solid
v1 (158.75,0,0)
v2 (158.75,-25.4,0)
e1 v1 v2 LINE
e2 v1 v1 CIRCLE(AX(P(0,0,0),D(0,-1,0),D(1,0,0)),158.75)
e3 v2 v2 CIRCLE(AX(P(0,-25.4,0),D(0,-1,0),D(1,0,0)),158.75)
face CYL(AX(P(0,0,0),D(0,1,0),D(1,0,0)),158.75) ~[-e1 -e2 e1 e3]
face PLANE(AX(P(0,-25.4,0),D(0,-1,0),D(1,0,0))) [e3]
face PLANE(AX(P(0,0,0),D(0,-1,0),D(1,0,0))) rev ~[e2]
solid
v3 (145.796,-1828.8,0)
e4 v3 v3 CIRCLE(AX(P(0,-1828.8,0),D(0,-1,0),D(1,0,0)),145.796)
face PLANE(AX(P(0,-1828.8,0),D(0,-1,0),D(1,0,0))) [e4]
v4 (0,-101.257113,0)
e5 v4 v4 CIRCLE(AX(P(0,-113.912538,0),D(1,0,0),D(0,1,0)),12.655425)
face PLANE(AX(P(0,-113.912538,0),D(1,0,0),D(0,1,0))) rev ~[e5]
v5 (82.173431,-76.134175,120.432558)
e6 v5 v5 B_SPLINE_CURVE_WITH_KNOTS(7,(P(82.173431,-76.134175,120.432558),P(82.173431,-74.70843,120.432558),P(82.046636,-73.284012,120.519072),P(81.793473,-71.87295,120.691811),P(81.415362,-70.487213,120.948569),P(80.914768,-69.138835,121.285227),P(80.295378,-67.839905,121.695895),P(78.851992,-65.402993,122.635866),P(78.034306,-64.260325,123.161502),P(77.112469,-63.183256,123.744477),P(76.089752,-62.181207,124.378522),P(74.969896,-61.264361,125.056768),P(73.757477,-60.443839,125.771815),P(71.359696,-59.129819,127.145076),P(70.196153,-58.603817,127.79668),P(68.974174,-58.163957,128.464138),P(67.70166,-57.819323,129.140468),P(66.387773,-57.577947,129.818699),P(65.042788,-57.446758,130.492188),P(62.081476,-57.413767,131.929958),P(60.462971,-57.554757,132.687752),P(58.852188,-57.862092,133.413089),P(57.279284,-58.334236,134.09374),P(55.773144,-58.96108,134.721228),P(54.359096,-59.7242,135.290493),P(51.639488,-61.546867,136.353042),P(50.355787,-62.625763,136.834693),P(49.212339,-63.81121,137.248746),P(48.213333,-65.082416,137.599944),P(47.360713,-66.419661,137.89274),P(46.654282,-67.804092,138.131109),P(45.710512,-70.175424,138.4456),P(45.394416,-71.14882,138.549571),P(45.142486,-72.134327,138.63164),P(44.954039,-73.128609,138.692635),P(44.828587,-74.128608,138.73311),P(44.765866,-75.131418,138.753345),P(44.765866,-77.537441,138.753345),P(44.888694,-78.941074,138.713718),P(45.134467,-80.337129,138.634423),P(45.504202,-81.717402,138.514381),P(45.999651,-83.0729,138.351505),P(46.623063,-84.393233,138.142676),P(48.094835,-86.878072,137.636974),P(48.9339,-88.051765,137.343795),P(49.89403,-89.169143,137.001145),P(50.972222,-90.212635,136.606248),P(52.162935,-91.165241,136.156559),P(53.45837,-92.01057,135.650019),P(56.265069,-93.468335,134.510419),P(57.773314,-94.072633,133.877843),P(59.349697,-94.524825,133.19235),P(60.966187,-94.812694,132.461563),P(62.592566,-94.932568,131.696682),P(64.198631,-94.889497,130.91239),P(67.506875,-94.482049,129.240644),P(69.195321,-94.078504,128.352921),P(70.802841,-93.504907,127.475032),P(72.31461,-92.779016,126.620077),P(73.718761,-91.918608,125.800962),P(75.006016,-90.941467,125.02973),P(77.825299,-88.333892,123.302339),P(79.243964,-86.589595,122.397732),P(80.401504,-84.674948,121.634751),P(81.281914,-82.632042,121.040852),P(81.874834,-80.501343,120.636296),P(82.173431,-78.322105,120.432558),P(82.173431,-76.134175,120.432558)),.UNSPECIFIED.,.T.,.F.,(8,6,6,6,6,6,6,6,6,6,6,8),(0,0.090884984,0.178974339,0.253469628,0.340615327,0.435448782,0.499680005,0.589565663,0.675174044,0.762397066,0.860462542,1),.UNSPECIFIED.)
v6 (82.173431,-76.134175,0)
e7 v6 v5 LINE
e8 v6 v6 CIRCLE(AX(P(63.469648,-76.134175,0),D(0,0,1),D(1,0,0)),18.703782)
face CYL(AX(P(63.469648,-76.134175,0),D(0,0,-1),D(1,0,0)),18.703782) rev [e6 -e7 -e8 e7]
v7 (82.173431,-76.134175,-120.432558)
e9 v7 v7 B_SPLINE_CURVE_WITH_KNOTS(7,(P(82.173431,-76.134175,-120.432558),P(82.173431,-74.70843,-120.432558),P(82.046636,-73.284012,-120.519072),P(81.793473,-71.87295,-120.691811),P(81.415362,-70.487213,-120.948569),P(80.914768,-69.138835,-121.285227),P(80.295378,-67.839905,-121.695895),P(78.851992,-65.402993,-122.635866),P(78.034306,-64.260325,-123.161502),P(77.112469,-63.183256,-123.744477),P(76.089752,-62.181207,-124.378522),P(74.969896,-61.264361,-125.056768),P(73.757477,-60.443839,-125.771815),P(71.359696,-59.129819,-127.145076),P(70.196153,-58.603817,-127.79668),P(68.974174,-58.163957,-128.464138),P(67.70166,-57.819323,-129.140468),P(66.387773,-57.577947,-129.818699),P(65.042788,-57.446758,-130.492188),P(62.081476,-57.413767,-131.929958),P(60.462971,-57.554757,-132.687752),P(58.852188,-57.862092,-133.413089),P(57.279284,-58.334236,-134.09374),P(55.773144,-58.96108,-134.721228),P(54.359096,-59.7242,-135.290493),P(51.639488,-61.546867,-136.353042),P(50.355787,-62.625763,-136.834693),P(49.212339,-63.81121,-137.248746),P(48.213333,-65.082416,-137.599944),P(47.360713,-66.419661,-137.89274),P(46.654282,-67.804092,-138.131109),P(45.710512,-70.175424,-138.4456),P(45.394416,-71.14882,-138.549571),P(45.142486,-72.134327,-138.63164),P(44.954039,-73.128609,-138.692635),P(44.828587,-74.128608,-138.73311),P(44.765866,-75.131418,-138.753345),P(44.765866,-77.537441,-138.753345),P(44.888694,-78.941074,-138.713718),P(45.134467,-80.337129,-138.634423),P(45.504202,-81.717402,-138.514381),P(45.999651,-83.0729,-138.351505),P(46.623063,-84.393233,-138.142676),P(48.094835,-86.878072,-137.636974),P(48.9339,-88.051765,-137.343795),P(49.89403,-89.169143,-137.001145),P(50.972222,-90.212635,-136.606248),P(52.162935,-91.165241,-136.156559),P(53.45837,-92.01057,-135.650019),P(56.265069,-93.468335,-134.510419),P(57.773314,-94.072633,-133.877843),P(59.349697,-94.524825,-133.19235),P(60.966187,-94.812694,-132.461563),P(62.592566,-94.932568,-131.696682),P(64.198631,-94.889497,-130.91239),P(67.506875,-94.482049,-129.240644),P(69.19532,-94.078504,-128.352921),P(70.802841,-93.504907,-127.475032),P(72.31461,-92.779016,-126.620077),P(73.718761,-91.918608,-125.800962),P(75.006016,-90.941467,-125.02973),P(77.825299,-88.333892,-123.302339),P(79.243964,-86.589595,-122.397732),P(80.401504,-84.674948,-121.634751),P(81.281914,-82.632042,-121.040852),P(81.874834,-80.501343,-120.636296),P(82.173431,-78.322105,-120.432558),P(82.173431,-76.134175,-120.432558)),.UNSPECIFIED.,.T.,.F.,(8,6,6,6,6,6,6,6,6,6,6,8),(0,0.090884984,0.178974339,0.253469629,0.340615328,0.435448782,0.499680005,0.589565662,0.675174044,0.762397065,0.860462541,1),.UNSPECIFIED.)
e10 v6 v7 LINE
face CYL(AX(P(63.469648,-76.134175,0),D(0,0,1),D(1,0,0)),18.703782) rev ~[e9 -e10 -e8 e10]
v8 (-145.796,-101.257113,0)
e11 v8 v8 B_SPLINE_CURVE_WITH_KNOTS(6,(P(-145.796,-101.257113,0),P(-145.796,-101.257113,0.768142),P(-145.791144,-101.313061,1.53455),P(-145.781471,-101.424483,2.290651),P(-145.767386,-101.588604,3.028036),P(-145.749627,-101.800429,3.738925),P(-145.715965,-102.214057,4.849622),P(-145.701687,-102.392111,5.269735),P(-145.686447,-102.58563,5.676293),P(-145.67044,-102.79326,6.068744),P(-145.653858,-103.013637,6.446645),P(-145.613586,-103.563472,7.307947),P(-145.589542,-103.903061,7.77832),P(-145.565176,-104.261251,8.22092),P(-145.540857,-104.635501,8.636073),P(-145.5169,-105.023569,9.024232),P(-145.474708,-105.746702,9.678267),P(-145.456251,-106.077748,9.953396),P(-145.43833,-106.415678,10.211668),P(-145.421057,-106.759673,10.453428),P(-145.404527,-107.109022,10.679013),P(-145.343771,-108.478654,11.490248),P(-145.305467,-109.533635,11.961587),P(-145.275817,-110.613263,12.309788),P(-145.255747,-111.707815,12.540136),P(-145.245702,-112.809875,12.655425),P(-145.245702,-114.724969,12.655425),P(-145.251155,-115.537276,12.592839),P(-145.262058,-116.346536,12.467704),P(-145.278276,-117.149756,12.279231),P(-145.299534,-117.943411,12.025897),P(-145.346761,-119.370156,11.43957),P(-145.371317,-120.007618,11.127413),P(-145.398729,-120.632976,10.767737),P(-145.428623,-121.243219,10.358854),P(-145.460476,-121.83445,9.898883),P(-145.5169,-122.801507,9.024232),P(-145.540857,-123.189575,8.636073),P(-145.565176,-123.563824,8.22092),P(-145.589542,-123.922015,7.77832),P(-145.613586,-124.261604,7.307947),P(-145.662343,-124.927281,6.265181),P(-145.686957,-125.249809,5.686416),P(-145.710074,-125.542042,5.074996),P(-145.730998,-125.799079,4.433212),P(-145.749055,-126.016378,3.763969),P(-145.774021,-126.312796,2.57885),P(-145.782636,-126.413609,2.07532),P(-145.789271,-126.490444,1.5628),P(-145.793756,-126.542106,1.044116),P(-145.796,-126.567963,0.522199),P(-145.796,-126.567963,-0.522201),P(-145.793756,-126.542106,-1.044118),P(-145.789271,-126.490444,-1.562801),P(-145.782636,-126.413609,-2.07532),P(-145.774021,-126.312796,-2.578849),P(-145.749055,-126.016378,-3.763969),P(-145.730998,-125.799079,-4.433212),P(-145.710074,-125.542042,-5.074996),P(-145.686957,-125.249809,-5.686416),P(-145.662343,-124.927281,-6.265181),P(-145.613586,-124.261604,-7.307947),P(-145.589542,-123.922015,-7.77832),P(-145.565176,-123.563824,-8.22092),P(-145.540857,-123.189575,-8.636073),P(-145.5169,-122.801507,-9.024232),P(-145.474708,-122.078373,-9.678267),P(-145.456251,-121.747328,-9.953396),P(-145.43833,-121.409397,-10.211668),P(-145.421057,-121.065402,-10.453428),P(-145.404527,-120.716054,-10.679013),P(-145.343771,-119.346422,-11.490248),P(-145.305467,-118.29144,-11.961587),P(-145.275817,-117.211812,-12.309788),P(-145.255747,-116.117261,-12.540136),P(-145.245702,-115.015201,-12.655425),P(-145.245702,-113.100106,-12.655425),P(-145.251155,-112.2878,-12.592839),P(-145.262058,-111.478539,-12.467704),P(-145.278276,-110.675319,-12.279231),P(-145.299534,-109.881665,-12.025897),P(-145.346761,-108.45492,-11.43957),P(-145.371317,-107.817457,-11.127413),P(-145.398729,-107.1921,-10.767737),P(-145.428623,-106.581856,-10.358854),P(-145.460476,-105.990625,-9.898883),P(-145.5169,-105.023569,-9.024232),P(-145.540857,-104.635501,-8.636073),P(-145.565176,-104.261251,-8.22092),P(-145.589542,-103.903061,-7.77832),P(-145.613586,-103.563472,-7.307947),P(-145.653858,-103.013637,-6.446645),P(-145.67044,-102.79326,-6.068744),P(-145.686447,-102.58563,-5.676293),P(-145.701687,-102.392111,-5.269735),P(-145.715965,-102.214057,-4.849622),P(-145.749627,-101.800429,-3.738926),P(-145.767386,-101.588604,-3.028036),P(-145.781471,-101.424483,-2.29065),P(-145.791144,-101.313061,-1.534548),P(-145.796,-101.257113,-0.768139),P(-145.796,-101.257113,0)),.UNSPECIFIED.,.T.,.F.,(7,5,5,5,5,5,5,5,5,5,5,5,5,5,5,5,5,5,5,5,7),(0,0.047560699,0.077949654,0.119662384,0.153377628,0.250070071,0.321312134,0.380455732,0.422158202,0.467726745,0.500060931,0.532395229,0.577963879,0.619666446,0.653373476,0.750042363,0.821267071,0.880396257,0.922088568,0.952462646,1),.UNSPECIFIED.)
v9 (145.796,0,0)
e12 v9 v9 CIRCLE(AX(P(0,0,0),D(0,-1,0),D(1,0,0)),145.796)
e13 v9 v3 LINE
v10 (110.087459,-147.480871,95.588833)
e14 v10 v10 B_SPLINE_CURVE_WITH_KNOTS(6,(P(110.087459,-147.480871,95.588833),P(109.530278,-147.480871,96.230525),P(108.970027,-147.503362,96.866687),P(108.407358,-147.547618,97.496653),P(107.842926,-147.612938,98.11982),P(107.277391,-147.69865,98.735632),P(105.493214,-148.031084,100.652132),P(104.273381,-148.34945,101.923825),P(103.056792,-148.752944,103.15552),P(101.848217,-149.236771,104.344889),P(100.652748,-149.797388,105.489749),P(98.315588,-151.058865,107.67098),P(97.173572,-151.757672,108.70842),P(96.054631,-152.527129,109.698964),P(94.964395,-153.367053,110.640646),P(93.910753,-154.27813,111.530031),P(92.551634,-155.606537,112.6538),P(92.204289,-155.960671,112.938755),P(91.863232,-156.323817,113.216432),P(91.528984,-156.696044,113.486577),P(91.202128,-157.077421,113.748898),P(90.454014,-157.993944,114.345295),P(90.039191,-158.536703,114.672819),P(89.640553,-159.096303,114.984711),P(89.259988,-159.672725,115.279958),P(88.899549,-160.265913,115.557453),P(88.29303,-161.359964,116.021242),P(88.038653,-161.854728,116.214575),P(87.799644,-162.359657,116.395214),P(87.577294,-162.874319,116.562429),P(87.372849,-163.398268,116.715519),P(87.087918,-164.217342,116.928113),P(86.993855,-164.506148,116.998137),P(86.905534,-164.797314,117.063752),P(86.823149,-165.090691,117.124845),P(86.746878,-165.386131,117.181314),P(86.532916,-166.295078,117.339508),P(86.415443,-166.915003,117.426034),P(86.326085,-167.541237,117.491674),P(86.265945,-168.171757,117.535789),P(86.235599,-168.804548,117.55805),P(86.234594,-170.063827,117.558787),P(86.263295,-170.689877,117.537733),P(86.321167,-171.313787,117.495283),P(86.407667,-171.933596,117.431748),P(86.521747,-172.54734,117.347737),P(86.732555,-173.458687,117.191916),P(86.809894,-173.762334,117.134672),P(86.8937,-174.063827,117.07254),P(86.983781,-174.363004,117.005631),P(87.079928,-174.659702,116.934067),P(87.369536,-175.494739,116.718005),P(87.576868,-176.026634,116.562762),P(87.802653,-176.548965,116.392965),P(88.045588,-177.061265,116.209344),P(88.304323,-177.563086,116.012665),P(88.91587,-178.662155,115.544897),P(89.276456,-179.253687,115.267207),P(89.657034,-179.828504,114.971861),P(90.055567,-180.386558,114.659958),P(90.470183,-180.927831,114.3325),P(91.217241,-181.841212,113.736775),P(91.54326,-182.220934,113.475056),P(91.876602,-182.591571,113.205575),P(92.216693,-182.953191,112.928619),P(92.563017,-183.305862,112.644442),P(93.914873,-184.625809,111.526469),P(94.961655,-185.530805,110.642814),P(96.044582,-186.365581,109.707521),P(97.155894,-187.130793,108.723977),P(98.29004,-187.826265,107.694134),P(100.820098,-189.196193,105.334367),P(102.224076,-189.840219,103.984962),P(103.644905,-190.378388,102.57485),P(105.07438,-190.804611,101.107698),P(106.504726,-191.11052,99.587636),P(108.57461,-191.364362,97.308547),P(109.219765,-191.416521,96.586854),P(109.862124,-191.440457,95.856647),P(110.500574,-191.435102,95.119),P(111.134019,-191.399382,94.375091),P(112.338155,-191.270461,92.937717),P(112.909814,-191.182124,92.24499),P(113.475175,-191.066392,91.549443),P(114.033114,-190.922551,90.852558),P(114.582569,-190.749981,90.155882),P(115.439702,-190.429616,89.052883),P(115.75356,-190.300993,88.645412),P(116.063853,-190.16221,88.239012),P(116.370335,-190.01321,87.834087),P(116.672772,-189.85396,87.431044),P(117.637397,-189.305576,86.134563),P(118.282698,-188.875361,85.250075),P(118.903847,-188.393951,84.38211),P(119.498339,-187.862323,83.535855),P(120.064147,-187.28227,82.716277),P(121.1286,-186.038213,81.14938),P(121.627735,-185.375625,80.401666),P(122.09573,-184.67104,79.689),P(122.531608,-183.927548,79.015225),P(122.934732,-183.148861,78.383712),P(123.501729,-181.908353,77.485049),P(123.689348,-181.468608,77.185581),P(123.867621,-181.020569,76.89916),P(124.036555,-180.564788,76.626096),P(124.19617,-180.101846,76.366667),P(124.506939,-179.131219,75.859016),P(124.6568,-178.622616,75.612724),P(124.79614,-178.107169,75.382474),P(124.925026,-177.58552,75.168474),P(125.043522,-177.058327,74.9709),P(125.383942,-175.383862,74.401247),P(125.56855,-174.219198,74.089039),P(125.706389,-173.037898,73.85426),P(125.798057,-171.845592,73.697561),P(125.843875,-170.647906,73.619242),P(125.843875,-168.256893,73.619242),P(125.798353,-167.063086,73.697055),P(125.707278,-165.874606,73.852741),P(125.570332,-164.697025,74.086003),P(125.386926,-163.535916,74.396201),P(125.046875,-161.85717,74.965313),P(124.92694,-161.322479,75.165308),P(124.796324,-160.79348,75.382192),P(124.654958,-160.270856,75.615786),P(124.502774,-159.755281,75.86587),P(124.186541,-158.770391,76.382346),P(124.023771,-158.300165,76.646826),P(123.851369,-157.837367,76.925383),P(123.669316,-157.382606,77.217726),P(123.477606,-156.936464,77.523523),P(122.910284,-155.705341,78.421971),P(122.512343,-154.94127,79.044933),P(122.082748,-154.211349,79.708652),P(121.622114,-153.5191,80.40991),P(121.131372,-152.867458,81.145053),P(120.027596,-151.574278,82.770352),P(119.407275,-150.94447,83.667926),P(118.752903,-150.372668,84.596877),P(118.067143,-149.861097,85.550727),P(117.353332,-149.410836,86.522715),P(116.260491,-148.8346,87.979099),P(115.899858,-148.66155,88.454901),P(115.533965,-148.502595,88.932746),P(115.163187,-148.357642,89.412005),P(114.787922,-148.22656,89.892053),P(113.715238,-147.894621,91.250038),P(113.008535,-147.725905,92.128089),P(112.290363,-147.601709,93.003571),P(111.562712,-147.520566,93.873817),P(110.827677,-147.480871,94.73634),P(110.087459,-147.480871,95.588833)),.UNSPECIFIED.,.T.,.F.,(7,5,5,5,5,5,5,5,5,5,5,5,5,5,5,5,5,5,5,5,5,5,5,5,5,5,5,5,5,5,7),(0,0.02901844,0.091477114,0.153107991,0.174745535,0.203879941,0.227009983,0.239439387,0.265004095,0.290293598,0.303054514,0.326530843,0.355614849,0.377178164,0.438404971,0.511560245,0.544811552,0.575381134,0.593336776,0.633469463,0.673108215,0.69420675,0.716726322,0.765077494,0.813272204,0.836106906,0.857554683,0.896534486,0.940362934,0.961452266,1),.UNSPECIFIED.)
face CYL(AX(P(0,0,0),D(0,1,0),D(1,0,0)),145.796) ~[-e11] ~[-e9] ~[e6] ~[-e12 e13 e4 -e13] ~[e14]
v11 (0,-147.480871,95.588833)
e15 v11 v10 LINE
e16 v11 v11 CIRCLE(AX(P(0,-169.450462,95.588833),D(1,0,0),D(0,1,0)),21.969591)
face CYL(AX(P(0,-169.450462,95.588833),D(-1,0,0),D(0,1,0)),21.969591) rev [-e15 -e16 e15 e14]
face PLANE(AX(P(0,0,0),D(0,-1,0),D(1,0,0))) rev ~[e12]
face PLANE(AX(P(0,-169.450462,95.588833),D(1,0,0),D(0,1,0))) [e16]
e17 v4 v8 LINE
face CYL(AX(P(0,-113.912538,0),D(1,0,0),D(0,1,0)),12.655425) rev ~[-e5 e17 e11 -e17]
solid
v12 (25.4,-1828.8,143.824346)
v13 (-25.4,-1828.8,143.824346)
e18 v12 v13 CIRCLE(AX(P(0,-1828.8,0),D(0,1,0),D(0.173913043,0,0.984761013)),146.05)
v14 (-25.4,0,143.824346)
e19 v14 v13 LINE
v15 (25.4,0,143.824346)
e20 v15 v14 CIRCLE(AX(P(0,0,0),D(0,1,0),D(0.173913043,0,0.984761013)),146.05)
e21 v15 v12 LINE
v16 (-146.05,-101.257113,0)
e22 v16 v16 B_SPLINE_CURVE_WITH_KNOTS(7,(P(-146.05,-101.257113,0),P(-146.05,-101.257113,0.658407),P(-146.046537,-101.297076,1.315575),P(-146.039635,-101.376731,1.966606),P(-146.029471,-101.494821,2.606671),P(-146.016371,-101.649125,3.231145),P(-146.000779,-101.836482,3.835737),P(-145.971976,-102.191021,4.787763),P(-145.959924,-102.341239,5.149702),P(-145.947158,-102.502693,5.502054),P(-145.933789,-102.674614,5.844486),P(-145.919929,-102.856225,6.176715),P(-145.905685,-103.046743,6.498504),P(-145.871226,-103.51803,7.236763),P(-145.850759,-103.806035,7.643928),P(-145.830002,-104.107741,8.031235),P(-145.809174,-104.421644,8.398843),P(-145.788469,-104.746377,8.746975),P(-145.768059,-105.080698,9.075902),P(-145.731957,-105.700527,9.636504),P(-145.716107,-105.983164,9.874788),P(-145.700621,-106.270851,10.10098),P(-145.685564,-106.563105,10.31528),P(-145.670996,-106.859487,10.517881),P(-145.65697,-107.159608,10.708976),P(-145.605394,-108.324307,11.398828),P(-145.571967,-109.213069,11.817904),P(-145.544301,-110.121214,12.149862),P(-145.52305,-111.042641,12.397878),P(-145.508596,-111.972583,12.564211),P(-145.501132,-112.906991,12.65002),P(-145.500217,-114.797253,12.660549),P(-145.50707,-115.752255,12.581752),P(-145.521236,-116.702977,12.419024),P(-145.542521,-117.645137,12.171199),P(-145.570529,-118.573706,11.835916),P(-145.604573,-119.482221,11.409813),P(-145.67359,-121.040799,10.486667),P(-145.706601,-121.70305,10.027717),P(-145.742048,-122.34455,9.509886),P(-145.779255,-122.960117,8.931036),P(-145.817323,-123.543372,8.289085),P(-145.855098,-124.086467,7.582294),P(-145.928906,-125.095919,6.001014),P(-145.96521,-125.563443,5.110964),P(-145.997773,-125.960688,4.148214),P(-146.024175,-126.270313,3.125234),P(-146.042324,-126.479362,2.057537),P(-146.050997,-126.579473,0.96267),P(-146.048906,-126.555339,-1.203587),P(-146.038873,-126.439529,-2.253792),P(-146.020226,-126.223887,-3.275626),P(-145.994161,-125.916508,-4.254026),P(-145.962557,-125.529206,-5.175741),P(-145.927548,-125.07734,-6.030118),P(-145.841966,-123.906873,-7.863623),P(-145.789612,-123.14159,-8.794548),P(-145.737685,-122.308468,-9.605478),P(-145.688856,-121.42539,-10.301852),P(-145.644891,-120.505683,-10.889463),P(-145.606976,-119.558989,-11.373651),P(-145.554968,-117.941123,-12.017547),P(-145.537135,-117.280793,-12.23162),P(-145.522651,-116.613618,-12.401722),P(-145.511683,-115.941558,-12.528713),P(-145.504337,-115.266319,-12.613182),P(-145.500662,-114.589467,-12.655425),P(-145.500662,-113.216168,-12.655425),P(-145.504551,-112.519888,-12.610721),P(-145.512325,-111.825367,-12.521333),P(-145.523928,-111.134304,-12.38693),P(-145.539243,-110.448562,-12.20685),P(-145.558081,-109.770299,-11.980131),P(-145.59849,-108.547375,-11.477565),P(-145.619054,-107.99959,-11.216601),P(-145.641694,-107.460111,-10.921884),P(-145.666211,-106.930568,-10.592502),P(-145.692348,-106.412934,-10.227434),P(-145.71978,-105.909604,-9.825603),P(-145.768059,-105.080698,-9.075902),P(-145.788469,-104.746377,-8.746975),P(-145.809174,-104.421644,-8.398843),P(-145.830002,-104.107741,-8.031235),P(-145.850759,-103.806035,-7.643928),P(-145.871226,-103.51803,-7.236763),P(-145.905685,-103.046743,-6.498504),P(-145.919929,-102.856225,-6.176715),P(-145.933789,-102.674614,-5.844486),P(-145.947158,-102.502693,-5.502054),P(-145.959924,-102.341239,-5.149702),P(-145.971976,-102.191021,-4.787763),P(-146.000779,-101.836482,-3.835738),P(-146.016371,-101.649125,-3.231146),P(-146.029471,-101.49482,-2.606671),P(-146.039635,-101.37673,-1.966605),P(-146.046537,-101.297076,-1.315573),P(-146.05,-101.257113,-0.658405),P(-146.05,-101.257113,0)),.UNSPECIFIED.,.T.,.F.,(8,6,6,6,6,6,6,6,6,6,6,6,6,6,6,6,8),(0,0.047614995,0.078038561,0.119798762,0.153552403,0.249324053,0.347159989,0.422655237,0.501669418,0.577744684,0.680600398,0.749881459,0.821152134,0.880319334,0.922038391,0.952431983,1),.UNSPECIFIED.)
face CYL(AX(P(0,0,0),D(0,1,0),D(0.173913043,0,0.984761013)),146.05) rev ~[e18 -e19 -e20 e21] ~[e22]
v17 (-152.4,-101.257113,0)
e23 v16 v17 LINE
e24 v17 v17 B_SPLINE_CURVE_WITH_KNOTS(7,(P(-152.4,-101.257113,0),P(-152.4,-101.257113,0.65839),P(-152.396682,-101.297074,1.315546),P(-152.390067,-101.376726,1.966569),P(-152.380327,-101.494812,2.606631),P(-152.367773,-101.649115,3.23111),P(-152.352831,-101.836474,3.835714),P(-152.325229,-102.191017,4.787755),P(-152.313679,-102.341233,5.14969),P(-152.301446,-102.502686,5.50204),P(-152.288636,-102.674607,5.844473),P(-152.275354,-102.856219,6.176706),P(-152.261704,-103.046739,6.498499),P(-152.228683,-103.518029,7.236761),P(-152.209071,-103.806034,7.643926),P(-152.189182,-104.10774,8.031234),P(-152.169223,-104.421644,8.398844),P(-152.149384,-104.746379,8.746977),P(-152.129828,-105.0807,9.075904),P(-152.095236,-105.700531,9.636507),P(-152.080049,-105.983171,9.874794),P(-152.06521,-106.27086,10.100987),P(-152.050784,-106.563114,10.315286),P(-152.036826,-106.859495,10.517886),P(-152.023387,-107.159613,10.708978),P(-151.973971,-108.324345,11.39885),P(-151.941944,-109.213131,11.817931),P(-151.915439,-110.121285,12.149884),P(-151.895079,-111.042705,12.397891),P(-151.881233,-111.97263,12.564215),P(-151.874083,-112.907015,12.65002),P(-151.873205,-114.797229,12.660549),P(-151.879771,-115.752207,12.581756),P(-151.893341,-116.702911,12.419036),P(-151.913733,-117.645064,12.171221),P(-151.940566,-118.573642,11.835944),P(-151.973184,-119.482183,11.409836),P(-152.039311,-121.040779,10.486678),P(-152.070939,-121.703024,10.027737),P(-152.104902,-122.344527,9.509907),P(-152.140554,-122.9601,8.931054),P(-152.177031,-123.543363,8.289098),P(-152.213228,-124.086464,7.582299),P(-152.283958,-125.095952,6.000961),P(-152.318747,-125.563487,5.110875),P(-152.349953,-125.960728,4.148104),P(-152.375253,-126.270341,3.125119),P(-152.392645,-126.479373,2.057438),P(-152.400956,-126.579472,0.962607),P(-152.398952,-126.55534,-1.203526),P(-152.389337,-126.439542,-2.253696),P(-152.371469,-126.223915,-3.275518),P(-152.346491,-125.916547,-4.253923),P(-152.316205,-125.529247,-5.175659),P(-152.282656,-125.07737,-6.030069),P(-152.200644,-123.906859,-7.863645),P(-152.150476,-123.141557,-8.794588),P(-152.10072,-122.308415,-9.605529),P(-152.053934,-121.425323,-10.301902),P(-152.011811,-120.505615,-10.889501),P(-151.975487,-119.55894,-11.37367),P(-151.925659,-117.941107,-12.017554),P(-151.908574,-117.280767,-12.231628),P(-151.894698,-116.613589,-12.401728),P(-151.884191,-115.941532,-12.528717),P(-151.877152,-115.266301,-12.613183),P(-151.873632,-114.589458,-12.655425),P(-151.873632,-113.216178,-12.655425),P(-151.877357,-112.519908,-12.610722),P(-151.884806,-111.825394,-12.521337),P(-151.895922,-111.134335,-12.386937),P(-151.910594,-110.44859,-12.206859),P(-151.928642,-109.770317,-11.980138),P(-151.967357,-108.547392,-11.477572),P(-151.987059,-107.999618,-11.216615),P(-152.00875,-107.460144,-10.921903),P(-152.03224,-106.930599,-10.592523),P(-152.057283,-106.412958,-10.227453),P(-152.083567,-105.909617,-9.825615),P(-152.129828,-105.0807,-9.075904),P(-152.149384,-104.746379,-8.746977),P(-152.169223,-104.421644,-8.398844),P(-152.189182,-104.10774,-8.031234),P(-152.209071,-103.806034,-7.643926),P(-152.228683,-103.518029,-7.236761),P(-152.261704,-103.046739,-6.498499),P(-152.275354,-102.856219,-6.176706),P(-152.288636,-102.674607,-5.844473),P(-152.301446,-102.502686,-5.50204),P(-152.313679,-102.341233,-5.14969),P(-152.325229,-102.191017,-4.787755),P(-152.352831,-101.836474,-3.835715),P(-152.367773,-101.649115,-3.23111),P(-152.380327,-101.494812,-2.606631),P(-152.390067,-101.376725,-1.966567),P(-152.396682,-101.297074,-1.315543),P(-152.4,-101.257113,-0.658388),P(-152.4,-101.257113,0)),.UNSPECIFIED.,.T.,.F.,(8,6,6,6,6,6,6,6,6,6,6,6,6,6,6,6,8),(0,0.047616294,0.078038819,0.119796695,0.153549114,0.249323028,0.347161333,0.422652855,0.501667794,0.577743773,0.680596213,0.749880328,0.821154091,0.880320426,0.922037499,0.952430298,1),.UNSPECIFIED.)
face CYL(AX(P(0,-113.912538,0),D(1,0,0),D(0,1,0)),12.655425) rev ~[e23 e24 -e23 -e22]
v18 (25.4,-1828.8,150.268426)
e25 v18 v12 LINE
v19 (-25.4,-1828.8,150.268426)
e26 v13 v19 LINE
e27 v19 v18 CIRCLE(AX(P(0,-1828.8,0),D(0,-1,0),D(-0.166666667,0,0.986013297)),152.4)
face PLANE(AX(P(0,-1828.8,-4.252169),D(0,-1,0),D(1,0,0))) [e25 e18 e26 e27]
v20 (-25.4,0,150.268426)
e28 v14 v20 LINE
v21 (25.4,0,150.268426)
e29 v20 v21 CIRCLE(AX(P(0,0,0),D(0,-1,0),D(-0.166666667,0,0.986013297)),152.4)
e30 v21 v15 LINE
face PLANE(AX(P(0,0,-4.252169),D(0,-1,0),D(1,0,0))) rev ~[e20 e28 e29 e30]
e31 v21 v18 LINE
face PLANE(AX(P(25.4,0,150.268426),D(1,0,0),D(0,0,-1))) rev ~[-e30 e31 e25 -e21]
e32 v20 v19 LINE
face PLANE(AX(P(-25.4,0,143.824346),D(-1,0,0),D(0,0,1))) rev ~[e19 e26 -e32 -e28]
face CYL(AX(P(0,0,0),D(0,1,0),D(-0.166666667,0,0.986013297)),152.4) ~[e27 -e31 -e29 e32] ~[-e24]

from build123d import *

# Parameters (mm, degrees)
F1_DEPTH      = 1828.8
F2_R          = 145.796
F3_DEPTH      = 1828.8
F4_R          = 18.7037822151
F5_DEPTH      = 152.401
F5_DEPTH_BACK = 150.2694264907
F6_R          = 158.75
F7_DEPTH      = 25.4
F8_R          = 21.9695909942
F9_DEPTH      = 254
F10_R         = 12.6554250347
F11_DEPTH     = 355.6


with BuildPart() as f1:
    # F0 (on Front) → F1 (new body)
    with BuildSketch(Plane.XZ):
        with BuildLine():
            Line((-25.4, 143.8243459919), (-25.4, 150.2684264907))
            ThreePointArc((-25.4, 150.2684264907), (0, -152.4), (25.4, 150.2684264907))
            Line((25.4, 150.2684264907), (25.4, 143.8243459919))
            ThreePointArc((25.4, 143.8243459919), (0, -146.05), (-25.4, 143.8243459919))
        make_face()
    extrude(amount=F1_DEPTH)


with BuildPart() as f3:
    # F2 (on Front) → F3 (new body)
    with BuildSketch(Plane.XZ):
        Circle(F2_R)
    extrude(amount=F3_DEPTH)

    # F4 (on Top) → F5 (cut, two sides)
    with BuildSketch(Plane.XY) as f5_sk:
        with Locations((63.4696483612, -76.1341750622)):
            Circle(F4_R)
    extrude(amount=-F5_DEPTH, mode=Mode.SUBTRACT)
    extrude(f5_sk.sketch, amount=F5_DEPTH_BACK, mode=Mode.SUBTRACT)

    # F8 (on Right) → F9 (cut)
    with BuildSketch(Plane.YZ):
        with Locations((-169.4504618645, 95.5888330936)):
            Circle(F8_R)
    extrude(amount=F9_DEPTH, mode=Mode.SUBTRACT)


with BuildPart() as f7:
    # F6 (on Front) → F7 (new body)
    with BuildSketch(Plane.XZ):
        Circle(F6_R)
    extrude(amount=F7_DEPTH)


with BuildPart() as f11_tool:
    # F10 (on Right) → F11 (new body)
    with BuildSketch(Plane.YZ):
        with Locations((-113.912537694, 0)):
            Circle(F10_R)
    extrude(amount=-F11_DEPTH)


with BuildPart() as f1_1:
    add(f1.part)

    # F11: cut by f11_tool
    add(f11_tool.part, mode=Mode.SUBTRACT)


with BuildPart() as f3_1:
    add(f3.part)

    # F11: cut by f11_tool
    add(f11_tool.part, mode=Mode.SUBTRACT)


solid = Compound([f7.part, f1_1.part, f3_1.part])
